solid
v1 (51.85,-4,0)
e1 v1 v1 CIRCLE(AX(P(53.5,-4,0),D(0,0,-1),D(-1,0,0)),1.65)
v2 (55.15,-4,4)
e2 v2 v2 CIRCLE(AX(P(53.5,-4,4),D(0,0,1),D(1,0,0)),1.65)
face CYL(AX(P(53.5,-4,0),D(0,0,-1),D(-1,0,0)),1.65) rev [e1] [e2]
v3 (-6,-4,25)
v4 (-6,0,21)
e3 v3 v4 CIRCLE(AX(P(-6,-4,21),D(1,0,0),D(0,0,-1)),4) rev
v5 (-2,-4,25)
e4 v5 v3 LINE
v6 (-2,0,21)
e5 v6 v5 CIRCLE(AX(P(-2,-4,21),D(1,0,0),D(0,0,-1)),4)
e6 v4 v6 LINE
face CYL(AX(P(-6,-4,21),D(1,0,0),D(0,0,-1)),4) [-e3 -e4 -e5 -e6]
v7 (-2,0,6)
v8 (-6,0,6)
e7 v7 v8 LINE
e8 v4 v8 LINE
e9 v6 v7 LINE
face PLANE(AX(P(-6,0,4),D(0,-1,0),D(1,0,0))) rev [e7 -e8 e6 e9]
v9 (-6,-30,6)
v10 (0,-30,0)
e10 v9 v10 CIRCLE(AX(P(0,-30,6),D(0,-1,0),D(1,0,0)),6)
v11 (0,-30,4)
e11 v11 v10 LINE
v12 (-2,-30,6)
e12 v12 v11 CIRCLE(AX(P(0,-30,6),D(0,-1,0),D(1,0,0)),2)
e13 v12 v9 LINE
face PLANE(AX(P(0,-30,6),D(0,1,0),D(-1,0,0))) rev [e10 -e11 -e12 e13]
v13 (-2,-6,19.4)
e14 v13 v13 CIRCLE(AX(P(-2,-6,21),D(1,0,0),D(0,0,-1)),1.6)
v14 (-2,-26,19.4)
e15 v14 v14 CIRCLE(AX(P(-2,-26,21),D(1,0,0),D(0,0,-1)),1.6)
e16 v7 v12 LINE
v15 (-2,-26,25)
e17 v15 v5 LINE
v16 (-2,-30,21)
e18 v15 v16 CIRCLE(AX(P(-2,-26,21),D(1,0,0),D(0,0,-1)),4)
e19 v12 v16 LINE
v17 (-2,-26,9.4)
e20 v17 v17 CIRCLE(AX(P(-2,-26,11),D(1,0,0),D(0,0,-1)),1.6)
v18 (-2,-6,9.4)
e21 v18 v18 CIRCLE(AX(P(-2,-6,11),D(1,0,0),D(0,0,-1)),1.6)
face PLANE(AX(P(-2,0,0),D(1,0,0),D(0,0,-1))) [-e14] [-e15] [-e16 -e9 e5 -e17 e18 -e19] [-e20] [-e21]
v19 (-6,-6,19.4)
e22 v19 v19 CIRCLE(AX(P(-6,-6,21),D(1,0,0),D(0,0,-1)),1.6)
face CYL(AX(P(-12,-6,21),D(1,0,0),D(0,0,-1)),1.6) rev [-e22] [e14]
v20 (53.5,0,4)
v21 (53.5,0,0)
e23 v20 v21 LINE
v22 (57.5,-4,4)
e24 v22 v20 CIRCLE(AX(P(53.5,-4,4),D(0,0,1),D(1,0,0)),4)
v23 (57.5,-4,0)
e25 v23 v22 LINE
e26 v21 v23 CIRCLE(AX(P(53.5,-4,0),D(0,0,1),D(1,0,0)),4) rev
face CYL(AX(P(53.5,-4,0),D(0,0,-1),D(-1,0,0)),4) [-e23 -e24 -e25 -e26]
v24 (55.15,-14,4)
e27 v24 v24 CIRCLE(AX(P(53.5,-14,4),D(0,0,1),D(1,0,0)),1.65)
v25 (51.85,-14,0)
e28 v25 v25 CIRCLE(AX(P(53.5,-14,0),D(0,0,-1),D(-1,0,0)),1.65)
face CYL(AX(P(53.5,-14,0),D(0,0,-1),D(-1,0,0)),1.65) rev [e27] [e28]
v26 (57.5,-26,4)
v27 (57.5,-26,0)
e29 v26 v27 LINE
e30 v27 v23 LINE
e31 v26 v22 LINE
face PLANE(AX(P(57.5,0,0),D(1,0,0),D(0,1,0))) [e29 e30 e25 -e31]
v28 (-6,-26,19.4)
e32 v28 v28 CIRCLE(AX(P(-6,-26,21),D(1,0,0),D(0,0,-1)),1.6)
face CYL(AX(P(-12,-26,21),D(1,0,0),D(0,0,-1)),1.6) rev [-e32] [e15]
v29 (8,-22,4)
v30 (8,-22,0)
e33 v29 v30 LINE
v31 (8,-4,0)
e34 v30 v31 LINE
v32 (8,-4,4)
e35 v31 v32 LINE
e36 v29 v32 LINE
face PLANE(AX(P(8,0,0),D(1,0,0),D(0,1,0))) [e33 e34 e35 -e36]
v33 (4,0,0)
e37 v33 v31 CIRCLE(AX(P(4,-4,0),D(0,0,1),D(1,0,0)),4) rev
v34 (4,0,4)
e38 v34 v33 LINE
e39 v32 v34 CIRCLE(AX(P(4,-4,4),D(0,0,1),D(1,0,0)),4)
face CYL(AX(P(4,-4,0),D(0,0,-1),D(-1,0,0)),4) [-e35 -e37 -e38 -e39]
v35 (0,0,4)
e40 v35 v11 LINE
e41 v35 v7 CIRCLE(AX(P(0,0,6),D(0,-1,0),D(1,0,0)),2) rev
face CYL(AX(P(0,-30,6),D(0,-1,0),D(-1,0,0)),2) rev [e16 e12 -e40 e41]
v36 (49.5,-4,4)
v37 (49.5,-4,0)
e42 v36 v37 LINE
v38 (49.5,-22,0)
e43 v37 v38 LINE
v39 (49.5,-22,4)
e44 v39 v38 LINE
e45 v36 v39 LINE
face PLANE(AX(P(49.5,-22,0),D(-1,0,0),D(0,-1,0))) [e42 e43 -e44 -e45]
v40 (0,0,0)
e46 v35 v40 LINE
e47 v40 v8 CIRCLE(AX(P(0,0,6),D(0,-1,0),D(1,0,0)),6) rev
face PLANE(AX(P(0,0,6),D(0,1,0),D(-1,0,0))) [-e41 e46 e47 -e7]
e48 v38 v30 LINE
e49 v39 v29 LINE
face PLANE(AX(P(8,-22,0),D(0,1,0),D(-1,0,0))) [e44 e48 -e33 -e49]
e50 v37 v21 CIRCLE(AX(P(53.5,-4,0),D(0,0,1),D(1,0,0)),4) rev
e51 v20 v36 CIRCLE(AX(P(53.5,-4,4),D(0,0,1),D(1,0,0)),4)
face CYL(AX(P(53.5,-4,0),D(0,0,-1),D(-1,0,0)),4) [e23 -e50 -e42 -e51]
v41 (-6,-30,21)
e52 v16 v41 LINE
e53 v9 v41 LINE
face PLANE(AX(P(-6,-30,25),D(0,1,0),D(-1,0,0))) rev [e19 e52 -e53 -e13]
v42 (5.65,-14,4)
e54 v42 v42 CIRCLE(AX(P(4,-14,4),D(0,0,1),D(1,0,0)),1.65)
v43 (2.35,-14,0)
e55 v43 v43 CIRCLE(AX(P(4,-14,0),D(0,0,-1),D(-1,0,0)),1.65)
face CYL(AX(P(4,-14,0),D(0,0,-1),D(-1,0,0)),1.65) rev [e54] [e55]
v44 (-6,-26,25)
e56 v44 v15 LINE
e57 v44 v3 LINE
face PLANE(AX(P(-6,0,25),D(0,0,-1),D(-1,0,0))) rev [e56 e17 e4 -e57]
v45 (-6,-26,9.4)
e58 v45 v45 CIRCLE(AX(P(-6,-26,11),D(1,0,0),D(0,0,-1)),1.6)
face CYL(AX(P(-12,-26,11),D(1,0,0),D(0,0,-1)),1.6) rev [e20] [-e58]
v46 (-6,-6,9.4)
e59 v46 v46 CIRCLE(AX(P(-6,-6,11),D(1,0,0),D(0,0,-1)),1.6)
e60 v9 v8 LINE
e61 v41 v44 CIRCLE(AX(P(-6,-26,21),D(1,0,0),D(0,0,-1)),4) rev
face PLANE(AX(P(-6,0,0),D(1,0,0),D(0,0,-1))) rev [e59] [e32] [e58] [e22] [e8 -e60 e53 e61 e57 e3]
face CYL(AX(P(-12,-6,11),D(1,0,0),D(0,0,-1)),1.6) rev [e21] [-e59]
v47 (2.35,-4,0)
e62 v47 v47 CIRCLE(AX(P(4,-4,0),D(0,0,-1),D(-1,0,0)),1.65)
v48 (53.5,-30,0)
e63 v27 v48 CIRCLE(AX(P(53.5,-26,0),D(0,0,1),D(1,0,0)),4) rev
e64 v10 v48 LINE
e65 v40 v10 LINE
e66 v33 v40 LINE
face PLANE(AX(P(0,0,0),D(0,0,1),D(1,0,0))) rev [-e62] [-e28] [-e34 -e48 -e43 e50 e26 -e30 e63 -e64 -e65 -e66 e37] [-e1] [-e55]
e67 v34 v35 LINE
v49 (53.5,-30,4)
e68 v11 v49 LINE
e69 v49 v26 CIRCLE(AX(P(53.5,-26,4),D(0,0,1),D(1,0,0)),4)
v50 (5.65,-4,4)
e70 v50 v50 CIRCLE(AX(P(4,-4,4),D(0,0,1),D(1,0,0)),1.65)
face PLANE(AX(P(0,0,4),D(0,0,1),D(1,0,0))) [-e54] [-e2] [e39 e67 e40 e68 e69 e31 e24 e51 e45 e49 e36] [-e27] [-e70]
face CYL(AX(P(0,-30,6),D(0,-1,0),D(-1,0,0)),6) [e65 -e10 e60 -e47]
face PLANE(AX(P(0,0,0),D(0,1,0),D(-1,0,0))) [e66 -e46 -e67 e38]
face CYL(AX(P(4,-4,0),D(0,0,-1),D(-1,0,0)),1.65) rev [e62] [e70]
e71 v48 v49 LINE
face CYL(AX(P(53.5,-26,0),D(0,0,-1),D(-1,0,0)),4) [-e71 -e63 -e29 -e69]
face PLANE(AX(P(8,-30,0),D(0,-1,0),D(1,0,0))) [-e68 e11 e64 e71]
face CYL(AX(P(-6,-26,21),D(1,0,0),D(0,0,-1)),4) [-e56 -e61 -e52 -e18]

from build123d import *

# Parameters (mm, degrees)
EXTRUDE_1_DEPTH        = 4
SM_EDGE_FLANGE_1_DEPTH = 30
FILLET_1_R             = 4
SKETCH_27_R            = 1.6
CUT_EXTRUDE_1_DEPTH    = 10
M4X0_7_1_D             = 3.3


# Sheet-metal steps are written as plain solids
with BuildPart() as part:
    # Sketch 1 → 填料-伸長1 (new body)
    with BuildSketch(Plane.XY):
        Polygon((8, 0), (8, -22), (49.5, -22), (49.5, 0), (57.5, 0), (57.5, -30), (8, -30), (0, -30), (0, 0), align=None)
    extrude(amount=EXTRUDE_1_DEPTH)

    # 邊線-凸緣1 section (across the edge) → 邊線-凸緣1 (add)
    with BuildSketch(Plane(origin=(-2, 0, 4), x_dir=(1, 0, 0), z_dir=(0, -1, 0))):
        with BuildLine():
            Line((-4, 2), (-4, 21))
            Line((-4, 21), (0, 21))
            Line((0, 21), (0, 2))
            ThreePointArc((0, 2), (0.585786438, 0.585786438), (2, 0))
            Line((2, 0), (2, -4))
            ThreePointArc((2, -4), (-2.242640687, -2.242640687), (-4, 2))
        make_face()
    extrude(amount=SM_EDGE_FLANGE_1_DEPTH)

    # 圓角1
    fillet_1_edges = [part.edges().sort_by_distance(p)[0] for p in [
        (57.5, -30, 2),
        (57.5, 0, 2),
        (49.5, 0, 2),
        (8, 0, 2),
        (-4, 0, 25),
        (-4, -30, 25),
    ]]
    fillet(fillet_1_edges, radius=FILLET_1_R - 0.0001)  # a hair under: the kernel refuses the full size

    # 草圖27 → 除料-伸長1 (cut)
    with BuildSketch(Plane(origin=(-2, 0, 0), x_dir=(0, 0, -1), z_dir=(1, 0, 0))):
        with Locations((-21, -26)):
            Circle(SKETCH_27_R)
        with Locations((-11, -26)):
            Circle(SKETCH_27_R)
        with Locations((-11, -6)):
            Circle(SKETCH_27_R)
        with Locations((-21, -6)):
            Circle(SKETCH_27_R)
    extrude(amount=-CUT_EXTRUDE_1_DEPTH, mode=Mode.SUBTRACT)

    # M4x0.7 螺紋孔1 (through all)
    with Locations(Plane(origin=(53.5, -4, 0), x_dir=(-1, 0, 0), z_dir=(0, 0, -1))):
        with Locations((0, 0), (0, -10), (49.5, 0), (49.5, -10)):
            Hole(M4X0_7_1_D / 2)


solid = part.part
